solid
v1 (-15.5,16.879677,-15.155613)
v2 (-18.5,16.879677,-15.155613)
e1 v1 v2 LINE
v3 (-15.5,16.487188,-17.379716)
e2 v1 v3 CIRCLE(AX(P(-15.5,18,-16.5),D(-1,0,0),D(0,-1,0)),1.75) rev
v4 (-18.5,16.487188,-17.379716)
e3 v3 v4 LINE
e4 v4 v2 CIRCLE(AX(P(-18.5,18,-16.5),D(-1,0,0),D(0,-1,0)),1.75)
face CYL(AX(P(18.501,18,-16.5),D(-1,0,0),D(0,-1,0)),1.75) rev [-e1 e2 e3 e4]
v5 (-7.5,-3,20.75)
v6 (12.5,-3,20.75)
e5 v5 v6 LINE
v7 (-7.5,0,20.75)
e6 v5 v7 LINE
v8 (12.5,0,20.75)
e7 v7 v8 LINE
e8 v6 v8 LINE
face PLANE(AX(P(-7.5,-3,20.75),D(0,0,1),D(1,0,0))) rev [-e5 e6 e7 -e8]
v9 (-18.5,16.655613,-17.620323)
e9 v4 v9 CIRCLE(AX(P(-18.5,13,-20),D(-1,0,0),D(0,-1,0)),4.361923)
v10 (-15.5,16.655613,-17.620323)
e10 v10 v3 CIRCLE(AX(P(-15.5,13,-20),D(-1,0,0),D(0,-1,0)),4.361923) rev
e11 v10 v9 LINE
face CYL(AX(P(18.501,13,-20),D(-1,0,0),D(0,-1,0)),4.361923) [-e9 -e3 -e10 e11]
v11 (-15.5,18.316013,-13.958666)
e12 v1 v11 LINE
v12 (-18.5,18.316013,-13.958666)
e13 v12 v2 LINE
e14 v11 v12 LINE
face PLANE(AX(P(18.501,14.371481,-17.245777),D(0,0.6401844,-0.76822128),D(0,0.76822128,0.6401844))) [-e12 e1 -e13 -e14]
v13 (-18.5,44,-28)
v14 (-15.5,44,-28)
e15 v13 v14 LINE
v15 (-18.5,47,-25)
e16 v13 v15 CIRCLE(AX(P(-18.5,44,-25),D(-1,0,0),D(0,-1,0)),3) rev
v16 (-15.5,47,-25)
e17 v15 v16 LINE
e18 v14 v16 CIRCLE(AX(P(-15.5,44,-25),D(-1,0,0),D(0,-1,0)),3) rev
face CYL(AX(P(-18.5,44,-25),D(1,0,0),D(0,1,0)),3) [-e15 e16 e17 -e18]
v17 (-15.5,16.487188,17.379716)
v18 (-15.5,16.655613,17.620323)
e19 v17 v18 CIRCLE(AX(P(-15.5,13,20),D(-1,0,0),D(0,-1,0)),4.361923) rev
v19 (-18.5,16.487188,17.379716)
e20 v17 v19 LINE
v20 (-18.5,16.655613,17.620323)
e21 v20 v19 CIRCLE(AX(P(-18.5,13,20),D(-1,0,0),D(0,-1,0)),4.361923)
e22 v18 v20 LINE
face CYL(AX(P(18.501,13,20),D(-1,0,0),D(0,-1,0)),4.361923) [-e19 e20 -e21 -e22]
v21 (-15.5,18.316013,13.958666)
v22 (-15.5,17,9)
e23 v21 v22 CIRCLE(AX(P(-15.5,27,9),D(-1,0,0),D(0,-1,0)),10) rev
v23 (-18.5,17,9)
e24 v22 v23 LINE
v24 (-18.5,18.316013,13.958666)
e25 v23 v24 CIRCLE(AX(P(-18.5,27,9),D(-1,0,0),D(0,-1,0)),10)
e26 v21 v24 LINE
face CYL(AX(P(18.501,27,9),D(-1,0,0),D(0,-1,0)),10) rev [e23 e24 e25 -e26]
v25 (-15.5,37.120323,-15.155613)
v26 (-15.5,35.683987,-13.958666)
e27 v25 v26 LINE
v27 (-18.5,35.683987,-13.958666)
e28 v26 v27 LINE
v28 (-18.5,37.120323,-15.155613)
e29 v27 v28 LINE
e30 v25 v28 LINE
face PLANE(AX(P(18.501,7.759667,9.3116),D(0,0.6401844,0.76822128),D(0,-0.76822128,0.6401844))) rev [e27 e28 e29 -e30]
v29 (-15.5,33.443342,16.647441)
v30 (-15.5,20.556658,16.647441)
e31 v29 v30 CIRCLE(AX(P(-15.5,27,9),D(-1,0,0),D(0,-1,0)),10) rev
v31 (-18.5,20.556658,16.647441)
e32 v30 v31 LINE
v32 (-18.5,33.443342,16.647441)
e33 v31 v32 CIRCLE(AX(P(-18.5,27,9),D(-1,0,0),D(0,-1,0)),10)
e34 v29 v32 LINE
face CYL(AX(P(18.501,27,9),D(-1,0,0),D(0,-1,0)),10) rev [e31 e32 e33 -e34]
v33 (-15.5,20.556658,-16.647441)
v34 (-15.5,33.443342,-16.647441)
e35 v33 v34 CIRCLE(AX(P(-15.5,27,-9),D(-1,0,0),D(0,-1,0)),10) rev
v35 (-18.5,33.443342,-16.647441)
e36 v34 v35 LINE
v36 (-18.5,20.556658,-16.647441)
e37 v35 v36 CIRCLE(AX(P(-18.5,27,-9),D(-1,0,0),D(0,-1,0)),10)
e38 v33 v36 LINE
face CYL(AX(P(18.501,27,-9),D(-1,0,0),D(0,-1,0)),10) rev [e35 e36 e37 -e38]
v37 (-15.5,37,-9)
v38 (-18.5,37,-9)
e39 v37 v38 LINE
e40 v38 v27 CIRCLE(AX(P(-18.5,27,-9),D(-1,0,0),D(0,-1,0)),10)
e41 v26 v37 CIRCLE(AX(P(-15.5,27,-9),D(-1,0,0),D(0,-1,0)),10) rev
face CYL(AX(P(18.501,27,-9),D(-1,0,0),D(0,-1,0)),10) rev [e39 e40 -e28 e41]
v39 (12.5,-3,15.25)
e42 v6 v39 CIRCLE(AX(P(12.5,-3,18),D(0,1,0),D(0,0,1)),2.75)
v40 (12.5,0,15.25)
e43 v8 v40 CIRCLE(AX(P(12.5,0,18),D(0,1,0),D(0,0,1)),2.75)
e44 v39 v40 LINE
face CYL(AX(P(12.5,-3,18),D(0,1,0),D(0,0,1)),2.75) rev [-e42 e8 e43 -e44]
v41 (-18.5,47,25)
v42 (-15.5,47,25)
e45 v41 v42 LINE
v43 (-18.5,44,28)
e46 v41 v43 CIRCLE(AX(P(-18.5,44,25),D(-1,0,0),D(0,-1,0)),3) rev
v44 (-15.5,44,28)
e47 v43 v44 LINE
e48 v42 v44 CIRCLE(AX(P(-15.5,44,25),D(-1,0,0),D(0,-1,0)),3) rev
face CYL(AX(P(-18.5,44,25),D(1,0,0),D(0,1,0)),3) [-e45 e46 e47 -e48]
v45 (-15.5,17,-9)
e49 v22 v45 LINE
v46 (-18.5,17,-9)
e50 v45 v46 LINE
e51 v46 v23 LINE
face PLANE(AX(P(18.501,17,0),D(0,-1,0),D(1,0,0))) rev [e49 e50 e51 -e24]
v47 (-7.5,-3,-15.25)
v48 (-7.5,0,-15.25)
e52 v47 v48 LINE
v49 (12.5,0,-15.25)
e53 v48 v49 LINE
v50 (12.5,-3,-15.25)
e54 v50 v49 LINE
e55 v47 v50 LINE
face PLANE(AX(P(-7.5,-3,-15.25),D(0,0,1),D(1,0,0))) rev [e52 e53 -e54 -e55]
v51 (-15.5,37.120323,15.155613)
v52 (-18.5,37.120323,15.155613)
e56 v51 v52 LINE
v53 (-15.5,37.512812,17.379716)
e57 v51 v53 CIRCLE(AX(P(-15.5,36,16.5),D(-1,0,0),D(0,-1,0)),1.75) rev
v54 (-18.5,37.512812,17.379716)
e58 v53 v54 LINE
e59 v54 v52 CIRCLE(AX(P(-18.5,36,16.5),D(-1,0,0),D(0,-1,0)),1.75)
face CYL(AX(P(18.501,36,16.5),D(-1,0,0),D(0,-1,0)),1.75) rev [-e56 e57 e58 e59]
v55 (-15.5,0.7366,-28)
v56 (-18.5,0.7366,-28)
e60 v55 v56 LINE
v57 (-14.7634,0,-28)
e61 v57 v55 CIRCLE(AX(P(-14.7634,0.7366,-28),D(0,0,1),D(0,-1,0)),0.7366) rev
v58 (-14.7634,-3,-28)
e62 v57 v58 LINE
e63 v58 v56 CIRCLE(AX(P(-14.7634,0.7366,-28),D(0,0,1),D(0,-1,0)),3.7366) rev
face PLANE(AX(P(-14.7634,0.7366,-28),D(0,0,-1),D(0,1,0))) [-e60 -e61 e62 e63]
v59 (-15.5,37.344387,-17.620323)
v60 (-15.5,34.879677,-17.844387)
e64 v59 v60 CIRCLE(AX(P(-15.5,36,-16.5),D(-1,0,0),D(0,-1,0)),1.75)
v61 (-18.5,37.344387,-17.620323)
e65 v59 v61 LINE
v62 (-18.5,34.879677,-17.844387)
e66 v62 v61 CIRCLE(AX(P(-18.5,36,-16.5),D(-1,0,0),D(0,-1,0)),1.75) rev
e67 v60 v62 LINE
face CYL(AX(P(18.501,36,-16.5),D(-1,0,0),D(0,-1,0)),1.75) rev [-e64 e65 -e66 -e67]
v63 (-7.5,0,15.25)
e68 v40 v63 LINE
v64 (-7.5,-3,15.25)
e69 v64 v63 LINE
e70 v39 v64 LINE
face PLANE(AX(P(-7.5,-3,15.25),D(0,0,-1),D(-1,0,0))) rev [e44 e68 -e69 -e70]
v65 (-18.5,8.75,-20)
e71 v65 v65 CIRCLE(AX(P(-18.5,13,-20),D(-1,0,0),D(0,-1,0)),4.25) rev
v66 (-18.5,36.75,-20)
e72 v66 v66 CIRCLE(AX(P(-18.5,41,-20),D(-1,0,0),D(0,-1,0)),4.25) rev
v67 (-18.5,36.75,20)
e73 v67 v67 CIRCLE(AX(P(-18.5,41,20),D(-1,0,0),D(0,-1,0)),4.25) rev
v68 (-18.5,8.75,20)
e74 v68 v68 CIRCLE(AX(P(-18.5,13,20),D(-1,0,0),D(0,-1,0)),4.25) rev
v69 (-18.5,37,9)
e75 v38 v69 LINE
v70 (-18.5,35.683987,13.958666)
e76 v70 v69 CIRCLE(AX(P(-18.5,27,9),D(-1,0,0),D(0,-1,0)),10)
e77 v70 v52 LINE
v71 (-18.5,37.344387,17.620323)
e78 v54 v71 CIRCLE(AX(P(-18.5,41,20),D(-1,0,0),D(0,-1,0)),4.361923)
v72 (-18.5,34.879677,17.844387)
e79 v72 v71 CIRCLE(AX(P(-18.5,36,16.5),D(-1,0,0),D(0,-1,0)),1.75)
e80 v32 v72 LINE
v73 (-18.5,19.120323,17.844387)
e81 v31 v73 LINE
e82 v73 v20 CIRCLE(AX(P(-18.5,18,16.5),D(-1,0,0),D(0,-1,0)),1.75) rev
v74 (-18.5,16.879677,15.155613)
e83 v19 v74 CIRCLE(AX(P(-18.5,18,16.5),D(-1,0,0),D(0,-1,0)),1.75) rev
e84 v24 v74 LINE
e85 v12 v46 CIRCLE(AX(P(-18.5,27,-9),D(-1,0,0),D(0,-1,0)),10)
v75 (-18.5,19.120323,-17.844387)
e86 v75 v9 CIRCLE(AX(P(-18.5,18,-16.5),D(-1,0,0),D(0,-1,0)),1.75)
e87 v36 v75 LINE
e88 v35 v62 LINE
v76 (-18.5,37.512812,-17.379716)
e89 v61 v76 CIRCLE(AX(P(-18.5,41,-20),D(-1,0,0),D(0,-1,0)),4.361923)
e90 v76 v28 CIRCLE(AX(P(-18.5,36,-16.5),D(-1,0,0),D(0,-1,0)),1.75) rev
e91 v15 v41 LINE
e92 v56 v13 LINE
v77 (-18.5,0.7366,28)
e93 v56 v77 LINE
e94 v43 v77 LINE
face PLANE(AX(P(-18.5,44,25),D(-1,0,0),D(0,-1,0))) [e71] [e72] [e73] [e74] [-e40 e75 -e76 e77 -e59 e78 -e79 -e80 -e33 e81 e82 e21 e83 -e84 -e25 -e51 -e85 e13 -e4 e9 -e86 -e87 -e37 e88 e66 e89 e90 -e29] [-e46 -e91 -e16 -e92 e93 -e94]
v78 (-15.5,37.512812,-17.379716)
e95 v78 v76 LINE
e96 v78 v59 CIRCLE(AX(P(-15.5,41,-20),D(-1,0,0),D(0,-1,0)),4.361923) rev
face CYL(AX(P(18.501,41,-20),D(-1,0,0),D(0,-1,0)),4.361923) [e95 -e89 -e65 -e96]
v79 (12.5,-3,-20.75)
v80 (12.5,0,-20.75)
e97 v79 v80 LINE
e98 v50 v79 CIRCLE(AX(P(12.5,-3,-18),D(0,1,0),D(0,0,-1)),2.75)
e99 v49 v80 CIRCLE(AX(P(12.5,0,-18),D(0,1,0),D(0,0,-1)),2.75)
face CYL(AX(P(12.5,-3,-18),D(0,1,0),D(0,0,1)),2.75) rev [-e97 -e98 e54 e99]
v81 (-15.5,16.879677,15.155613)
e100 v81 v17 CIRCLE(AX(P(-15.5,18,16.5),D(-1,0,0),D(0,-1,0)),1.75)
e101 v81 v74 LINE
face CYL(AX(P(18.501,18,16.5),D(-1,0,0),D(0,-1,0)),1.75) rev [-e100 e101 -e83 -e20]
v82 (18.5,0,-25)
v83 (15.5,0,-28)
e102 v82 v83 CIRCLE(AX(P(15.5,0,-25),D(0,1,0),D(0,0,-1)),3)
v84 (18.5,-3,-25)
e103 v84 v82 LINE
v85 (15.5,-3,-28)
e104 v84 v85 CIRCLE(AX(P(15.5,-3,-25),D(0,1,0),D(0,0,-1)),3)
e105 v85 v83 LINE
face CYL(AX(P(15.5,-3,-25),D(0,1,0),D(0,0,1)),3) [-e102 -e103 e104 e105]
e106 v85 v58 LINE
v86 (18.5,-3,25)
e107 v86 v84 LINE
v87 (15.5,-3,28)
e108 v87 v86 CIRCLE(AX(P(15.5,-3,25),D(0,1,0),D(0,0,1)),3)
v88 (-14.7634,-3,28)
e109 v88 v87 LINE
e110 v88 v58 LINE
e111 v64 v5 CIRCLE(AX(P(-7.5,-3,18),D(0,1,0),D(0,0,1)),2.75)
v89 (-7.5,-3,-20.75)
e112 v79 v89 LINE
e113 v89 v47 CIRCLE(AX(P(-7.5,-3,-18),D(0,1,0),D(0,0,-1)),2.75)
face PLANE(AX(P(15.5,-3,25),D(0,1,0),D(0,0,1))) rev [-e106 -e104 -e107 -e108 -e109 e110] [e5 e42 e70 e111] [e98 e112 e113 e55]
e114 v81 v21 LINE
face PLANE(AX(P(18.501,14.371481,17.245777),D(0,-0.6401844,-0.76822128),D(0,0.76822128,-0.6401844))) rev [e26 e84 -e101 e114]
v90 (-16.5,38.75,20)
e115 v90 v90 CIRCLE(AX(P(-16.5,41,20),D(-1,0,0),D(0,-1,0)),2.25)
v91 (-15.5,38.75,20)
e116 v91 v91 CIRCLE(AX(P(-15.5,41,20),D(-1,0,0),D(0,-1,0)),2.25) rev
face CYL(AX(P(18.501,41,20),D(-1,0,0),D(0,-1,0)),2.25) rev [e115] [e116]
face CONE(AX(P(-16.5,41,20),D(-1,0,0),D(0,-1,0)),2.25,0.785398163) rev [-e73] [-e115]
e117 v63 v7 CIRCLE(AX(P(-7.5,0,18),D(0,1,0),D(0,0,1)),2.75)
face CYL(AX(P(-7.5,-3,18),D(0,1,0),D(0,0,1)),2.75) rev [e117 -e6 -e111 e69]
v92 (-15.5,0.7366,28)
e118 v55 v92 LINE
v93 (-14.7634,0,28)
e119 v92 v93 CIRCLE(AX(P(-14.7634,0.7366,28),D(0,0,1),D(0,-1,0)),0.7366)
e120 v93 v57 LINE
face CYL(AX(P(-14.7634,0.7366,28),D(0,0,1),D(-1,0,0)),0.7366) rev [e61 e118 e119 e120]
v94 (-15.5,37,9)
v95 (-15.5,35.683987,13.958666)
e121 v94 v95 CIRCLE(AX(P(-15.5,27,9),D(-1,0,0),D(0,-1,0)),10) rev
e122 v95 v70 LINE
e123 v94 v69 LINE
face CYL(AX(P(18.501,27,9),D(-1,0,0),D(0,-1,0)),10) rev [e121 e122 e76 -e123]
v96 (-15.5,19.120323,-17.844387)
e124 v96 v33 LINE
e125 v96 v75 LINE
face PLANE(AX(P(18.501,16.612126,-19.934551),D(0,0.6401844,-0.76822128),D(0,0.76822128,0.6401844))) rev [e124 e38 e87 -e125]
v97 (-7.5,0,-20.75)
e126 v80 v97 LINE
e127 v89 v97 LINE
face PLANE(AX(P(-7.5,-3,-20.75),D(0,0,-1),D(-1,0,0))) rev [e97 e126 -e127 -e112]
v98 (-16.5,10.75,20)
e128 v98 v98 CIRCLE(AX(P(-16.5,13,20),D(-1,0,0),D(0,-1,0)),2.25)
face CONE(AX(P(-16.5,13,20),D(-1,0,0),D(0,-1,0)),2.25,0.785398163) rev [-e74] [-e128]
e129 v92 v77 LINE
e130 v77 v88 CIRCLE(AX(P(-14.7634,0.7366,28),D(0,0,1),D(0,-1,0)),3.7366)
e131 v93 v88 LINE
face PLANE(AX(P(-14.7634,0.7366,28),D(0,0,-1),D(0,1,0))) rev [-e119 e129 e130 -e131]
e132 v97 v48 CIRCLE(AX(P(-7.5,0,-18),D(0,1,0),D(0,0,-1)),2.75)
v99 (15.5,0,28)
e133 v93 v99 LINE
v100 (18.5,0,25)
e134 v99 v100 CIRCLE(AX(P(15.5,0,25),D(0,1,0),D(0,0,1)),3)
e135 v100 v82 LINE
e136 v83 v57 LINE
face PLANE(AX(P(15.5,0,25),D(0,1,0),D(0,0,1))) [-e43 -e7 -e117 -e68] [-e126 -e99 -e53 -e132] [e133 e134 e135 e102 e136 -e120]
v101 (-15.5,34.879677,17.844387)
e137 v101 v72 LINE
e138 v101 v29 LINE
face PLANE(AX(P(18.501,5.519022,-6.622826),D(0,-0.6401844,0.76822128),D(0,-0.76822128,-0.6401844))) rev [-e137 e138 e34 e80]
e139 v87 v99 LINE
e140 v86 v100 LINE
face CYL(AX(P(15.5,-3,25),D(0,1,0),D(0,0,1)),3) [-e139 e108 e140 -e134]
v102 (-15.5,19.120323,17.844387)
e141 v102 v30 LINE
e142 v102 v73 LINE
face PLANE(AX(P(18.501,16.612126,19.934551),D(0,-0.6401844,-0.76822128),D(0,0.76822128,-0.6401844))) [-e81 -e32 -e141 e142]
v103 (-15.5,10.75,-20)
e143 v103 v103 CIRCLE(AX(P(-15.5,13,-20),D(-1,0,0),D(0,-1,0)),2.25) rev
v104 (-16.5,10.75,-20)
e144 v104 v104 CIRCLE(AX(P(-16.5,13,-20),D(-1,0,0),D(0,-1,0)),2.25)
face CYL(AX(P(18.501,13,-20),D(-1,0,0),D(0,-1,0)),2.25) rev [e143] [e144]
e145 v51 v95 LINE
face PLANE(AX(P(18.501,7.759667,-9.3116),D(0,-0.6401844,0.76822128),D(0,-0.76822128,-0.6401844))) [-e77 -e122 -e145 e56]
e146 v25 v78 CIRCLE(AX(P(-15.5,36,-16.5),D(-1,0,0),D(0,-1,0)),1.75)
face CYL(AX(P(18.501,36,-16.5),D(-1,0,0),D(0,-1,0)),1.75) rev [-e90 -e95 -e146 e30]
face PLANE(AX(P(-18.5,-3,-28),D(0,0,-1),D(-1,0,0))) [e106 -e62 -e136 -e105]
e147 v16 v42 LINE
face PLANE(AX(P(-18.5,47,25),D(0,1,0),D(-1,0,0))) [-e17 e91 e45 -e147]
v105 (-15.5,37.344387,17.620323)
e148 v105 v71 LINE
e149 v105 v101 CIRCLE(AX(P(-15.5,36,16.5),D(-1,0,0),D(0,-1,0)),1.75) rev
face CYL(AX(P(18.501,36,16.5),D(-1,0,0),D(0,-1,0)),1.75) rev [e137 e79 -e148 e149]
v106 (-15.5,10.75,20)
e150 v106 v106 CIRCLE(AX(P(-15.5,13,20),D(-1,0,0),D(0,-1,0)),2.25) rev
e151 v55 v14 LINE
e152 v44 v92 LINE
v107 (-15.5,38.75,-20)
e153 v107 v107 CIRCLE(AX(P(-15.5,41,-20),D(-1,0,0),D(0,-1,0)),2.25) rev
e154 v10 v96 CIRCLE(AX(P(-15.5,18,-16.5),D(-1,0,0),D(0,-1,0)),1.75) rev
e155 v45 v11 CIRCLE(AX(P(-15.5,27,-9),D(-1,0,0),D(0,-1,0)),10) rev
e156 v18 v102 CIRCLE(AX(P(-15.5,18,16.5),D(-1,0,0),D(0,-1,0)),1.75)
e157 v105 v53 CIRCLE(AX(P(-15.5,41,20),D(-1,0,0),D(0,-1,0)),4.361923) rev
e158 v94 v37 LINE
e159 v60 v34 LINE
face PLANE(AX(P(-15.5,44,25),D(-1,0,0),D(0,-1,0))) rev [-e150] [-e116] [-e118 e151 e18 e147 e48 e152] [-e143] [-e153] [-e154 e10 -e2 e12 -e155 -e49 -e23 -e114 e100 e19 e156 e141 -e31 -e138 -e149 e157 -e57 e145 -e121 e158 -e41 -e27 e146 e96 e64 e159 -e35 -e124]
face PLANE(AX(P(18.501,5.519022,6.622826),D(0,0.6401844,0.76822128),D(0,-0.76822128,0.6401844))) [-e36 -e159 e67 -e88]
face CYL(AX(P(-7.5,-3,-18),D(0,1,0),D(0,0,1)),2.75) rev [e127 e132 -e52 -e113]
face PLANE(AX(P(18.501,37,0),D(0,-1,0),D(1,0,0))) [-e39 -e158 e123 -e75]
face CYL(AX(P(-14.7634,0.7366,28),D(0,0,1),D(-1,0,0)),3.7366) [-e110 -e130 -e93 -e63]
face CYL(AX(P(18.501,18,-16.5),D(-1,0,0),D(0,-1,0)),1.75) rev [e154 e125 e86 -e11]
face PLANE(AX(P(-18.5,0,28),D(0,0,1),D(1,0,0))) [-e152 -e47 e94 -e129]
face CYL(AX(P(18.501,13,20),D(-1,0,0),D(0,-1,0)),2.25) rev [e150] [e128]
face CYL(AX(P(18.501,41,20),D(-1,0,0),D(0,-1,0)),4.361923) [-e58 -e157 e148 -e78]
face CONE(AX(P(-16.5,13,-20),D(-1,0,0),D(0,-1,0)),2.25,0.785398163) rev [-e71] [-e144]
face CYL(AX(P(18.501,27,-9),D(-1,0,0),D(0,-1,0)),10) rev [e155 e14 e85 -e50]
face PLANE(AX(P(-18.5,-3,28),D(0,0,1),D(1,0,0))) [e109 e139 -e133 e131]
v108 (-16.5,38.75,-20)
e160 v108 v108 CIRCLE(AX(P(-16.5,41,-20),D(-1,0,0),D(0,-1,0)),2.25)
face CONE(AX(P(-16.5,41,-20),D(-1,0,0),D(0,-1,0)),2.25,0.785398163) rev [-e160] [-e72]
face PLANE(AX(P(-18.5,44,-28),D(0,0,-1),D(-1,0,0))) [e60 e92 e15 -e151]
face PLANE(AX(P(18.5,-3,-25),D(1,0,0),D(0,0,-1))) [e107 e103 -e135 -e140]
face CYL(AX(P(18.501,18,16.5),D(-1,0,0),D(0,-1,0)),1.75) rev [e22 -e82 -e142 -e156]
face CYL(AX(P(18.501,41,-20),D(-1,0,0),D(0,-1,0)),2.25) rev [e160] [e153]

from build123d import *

# Parameters (mm, degrees)
BASE_FLANGE1_DEPTH           = 3
EDGE_FLANGE1_STRIP_W         = 13.4732
EDGE_FLANGE1_STRIP_H         = 3
EDGE_FLANGE1_STRIP_CUT_DEPTH = 56
EDGE_FLANGE1_DEPTH           = 56
EDGE_FLANGE1_FLAT_DEPTH      = 3
SKETCH5_R                    = 2.25
CUT_EXTRUDE1_DEPTH           = 3
CHAMFER1_SIZE                = 2


# Sheet-metal steps are written as plain solids
with BuildPart() as part:
    # Sketch1 → Base-Flange1 (new body)
    with BuildSketch(Plane(origin=(0, 0, 0), x_dir=(1, 0, 0), z_dir=(0, 1, 0))):
        with BuildLine():
            Line((-18.5, 28), (15.5, 28))
            ThreePointArc((15.5, 28), (17.621320344, 27.121320344), (18.5, 25))
            Line((18.5, 25), (18.5, -25))
            ThreePointArc((18.5, -25), (17.621320344, -27.121320344), (15.5, -28))
            Line((15.5, -28), (-18.5, -28))
            Line((-18.5, -28), (-18.5, 28))
        make_face()
        with BuildLine():
            Line((-7.5, -15.25), (12.5, -15.25))
            ThreePointArc((12.5, -15.25), (15.25, -18), (12.5, -20.75))
            Line((12.5, -20.75), (-7.5, -20.75))
            ThreePointArc((-7.5, -20.75), (-10.25, -18), (-7.5, -15.25))
        make_face(mode=Mode.SUBTRACT)
        with BuildLine():
            Line((-7.5, 15.25), (12.5, 15.25))
            ThreePointArc((12.5, 15.25), (15.25, 18), (12.5, 20.75))
            Line((12.5, 20.75), (-7.5, 20.75))
            ThreePointArc((-7.5, 20.75), (-10.25, 18), (-7.5, 15.25))
        make_face(mode=Mode.SUBTRACT)
    extrude(amount=-BASE_FLANGE1_DEPTH)

    # Edge-Flange1 strip (across the edge) → Edge-Flange1 strip cut (cut)
    with BuildSketch(Plane(origin=(-18.5, 0, -28), x_dir=(1, 0, 0), z_dir=(0, 0, 1))):
        with Locations((-3, -1.5)):
            Rectangle(EDGE_FLANGE1_STRIP_W, EDGE_FLANGE1_STRIP_H)
    extrude(amount=EDGE_FLANGE1_STRIP_CUT_DEPTH, mode=Mode.SUBTRACT)

    # Edge-Flange1 bend section (across the edge) → Edge-Flange1 (add)
    with BuildSketch(Plane(origin=(-18.5, 0, -28), x_dir=(1, 0, 0), z_dir=(0, 0, 1))):
        with BuildLine():
            Line((0, 0.7366), (3, 0.7366))
            ThreePointArc((3, 0.7366), (3.215745145, 0.215745145), (3.7366, 0))
            Line((3.7366, 0), (3.7366, -3))
            ThreePointArc((3.7366, -3), (1.094424801, -1.905575199), (0, 0.7366))
        make_face()
    extrude(amount=EDGE_FLANGE1_DEPTH)

    # Edge-Flange1 profile (on flange) → Edge-Flange1 flat (add)
    with BuildSketch(Plane(origin=(-18.5, 0, 0), x_dir=(0, 0, -1), z_dir=(1, 0, 0))):
        with BuildLine():
            Line((-28, 0.7366), (28, 0.7366))
            Line((28, 0.7366), (28, 44))
            ThreePointArc((28, 44), (27.121320344, 46.121320344), (25, 47))
            Line((25, 47), (-25, 47))
            ThreePointArc((-25, 47), (-27.121320344, 46.121320344), (-28, 44))
            Line((-28, 44), (-28, 0.7366))
        make_face()
    extrude(amount=EDGE_FLANGE1_FLAT_DEPTH)

    # Sketch5 → Cut-Extrude1 (cut)
    with BuildSketch(Plane.ZY.offset(18.5)):
        with BuildLine():
            Line((9, 37), (-9, 37))
            ThreePointArc((-9, 37), (-11.565163819, 36.665398832), (-13.958666275, 35.683986917))
            Line((-13.958666275, 35.683986917), (-15.155612761, 37.120322699))
            ThreePointArc((-15.155612761, 37.120322699), (-16.195875666, 37.723371228), (-17.379716482, 37.512811591))
            ThreePointArc((-17.379716482, 37.512811591), (-17.498601644, 37.426573777), (-17.620322699, 37.344387239))
            ThreePointArc((-17.620322699, 37.344387239), (-18.242813111, 36.158437556), (-17.844387239, 34.879677301))
            Line((-17.844387239, 34.879677301), (-16.647440754, 33.443341518))
            ThreePointArc((-16.647440754, 33.443341518), (-19, 27), (-16.647440754, 20.556658482))
            Line((-16.647440754, 20.556658482), (-17.844387239, 19.120322699))
            ThreePointArc((-17.844387239, 19.120322699), (-18.242813111, 17.841562444), (-17.620322699, 16.655612761))
            ThreePointArc((-17.620322699, 16.655612761), (-17.498601644, 16.573426223), (-17.379716482, 16.487188409))
            ThreePointArc((-17.379716482, 16.487188409), (-16.195875666, 16.276628772), (-15.155612761, 16.879677301))
            Line((-15.155612761, 16.879677301), (-13.958666275, 18.316013083))
            ThreePointArc((-13.958666275, 18.316013083), (-11.565163819, 17.334601168), (-9, 17))
            Line((-9, 17), (9, 17))
            ThreePointArc((9, 17), (11.565163819, 17.334601168), (13.958666275, 18.316013083))
            Line((13.958666275, 18.316013083), (15.155612761, 16.879677301))
            ThreePointArc((15.155612761, 16.879677301), (16.195875666, 16.276628772), (17.379716482, 16.487188409))
            ThreePointArc((17.379716482, 16.487188409), (17.498601644, 16.573426223), (17.620322699, 16.655612761))
            ThreePointArc((17.620322699, 16.655612761), (18.242813111, 17.841562444), (17.844387239, 19.120322699))
            Line((17.844387239, 19.120322699), (16.647440754, 20.556658482))
            ThreePointArc((16.647440754, 20.556658482), (19, 27), (16.647440754, 33.443341518))
            Line((16.647440754, 33.443341518), (17.844387239, 34.879677301))
            ThreePointArc((17.844387239, 34.879677301), (18.242813111, 36.158437556), (17.620322699, 37.344387239))
            ThreePointArc((17.620322699, 37.344387239), (17.498601644, 37.426573777), (17.379716482, 37.512811591))
            ThreePointArc((17.379716482, 37.512811591), (16.195875666, 37.723371228), (15.155612761, 37.120322699))
            Line((15.155612761, 37.120322699), (13.958666275, 35.683986917))
            ThreePointArc((13.958666275, 35.683986917), (11.565163819, 36.665398832), (9, 37))
        make_face()
        with Locations(Location((20, 41, 0), (0, 0, 270))):
            Circle(SKETCH5_R)
        with Locations(Location((-20, 41, 0), (0, 0, 270))):
            Circle(SKETCH5_R)
        with Locations(Location((-20, 13, 0), (0, 0, 270))):
            Circle(SKETCH5_R)
        with Locations(Location((20, 13, 0), (0, 0, 270))):
            Circle(SKETCH5_R)
    extrude(amount=-CUT_EXTRUDE1_DEPTH, mode=Mode.SUBTRACT)

    # Chamfer1
    chamfer1_edges = [part.edges().sort_by_distance(p)[0] for p in [
        (-18.5, 15.25, -20),
        (-18.5, 15.25, 20),
        (-18.5, 43.25, 20),
        (-18.5, 43.25, -20),
    ]]
    chamfer(chamfer1_edges, length=CHAMFER1_SIZE)


solid = part.part
